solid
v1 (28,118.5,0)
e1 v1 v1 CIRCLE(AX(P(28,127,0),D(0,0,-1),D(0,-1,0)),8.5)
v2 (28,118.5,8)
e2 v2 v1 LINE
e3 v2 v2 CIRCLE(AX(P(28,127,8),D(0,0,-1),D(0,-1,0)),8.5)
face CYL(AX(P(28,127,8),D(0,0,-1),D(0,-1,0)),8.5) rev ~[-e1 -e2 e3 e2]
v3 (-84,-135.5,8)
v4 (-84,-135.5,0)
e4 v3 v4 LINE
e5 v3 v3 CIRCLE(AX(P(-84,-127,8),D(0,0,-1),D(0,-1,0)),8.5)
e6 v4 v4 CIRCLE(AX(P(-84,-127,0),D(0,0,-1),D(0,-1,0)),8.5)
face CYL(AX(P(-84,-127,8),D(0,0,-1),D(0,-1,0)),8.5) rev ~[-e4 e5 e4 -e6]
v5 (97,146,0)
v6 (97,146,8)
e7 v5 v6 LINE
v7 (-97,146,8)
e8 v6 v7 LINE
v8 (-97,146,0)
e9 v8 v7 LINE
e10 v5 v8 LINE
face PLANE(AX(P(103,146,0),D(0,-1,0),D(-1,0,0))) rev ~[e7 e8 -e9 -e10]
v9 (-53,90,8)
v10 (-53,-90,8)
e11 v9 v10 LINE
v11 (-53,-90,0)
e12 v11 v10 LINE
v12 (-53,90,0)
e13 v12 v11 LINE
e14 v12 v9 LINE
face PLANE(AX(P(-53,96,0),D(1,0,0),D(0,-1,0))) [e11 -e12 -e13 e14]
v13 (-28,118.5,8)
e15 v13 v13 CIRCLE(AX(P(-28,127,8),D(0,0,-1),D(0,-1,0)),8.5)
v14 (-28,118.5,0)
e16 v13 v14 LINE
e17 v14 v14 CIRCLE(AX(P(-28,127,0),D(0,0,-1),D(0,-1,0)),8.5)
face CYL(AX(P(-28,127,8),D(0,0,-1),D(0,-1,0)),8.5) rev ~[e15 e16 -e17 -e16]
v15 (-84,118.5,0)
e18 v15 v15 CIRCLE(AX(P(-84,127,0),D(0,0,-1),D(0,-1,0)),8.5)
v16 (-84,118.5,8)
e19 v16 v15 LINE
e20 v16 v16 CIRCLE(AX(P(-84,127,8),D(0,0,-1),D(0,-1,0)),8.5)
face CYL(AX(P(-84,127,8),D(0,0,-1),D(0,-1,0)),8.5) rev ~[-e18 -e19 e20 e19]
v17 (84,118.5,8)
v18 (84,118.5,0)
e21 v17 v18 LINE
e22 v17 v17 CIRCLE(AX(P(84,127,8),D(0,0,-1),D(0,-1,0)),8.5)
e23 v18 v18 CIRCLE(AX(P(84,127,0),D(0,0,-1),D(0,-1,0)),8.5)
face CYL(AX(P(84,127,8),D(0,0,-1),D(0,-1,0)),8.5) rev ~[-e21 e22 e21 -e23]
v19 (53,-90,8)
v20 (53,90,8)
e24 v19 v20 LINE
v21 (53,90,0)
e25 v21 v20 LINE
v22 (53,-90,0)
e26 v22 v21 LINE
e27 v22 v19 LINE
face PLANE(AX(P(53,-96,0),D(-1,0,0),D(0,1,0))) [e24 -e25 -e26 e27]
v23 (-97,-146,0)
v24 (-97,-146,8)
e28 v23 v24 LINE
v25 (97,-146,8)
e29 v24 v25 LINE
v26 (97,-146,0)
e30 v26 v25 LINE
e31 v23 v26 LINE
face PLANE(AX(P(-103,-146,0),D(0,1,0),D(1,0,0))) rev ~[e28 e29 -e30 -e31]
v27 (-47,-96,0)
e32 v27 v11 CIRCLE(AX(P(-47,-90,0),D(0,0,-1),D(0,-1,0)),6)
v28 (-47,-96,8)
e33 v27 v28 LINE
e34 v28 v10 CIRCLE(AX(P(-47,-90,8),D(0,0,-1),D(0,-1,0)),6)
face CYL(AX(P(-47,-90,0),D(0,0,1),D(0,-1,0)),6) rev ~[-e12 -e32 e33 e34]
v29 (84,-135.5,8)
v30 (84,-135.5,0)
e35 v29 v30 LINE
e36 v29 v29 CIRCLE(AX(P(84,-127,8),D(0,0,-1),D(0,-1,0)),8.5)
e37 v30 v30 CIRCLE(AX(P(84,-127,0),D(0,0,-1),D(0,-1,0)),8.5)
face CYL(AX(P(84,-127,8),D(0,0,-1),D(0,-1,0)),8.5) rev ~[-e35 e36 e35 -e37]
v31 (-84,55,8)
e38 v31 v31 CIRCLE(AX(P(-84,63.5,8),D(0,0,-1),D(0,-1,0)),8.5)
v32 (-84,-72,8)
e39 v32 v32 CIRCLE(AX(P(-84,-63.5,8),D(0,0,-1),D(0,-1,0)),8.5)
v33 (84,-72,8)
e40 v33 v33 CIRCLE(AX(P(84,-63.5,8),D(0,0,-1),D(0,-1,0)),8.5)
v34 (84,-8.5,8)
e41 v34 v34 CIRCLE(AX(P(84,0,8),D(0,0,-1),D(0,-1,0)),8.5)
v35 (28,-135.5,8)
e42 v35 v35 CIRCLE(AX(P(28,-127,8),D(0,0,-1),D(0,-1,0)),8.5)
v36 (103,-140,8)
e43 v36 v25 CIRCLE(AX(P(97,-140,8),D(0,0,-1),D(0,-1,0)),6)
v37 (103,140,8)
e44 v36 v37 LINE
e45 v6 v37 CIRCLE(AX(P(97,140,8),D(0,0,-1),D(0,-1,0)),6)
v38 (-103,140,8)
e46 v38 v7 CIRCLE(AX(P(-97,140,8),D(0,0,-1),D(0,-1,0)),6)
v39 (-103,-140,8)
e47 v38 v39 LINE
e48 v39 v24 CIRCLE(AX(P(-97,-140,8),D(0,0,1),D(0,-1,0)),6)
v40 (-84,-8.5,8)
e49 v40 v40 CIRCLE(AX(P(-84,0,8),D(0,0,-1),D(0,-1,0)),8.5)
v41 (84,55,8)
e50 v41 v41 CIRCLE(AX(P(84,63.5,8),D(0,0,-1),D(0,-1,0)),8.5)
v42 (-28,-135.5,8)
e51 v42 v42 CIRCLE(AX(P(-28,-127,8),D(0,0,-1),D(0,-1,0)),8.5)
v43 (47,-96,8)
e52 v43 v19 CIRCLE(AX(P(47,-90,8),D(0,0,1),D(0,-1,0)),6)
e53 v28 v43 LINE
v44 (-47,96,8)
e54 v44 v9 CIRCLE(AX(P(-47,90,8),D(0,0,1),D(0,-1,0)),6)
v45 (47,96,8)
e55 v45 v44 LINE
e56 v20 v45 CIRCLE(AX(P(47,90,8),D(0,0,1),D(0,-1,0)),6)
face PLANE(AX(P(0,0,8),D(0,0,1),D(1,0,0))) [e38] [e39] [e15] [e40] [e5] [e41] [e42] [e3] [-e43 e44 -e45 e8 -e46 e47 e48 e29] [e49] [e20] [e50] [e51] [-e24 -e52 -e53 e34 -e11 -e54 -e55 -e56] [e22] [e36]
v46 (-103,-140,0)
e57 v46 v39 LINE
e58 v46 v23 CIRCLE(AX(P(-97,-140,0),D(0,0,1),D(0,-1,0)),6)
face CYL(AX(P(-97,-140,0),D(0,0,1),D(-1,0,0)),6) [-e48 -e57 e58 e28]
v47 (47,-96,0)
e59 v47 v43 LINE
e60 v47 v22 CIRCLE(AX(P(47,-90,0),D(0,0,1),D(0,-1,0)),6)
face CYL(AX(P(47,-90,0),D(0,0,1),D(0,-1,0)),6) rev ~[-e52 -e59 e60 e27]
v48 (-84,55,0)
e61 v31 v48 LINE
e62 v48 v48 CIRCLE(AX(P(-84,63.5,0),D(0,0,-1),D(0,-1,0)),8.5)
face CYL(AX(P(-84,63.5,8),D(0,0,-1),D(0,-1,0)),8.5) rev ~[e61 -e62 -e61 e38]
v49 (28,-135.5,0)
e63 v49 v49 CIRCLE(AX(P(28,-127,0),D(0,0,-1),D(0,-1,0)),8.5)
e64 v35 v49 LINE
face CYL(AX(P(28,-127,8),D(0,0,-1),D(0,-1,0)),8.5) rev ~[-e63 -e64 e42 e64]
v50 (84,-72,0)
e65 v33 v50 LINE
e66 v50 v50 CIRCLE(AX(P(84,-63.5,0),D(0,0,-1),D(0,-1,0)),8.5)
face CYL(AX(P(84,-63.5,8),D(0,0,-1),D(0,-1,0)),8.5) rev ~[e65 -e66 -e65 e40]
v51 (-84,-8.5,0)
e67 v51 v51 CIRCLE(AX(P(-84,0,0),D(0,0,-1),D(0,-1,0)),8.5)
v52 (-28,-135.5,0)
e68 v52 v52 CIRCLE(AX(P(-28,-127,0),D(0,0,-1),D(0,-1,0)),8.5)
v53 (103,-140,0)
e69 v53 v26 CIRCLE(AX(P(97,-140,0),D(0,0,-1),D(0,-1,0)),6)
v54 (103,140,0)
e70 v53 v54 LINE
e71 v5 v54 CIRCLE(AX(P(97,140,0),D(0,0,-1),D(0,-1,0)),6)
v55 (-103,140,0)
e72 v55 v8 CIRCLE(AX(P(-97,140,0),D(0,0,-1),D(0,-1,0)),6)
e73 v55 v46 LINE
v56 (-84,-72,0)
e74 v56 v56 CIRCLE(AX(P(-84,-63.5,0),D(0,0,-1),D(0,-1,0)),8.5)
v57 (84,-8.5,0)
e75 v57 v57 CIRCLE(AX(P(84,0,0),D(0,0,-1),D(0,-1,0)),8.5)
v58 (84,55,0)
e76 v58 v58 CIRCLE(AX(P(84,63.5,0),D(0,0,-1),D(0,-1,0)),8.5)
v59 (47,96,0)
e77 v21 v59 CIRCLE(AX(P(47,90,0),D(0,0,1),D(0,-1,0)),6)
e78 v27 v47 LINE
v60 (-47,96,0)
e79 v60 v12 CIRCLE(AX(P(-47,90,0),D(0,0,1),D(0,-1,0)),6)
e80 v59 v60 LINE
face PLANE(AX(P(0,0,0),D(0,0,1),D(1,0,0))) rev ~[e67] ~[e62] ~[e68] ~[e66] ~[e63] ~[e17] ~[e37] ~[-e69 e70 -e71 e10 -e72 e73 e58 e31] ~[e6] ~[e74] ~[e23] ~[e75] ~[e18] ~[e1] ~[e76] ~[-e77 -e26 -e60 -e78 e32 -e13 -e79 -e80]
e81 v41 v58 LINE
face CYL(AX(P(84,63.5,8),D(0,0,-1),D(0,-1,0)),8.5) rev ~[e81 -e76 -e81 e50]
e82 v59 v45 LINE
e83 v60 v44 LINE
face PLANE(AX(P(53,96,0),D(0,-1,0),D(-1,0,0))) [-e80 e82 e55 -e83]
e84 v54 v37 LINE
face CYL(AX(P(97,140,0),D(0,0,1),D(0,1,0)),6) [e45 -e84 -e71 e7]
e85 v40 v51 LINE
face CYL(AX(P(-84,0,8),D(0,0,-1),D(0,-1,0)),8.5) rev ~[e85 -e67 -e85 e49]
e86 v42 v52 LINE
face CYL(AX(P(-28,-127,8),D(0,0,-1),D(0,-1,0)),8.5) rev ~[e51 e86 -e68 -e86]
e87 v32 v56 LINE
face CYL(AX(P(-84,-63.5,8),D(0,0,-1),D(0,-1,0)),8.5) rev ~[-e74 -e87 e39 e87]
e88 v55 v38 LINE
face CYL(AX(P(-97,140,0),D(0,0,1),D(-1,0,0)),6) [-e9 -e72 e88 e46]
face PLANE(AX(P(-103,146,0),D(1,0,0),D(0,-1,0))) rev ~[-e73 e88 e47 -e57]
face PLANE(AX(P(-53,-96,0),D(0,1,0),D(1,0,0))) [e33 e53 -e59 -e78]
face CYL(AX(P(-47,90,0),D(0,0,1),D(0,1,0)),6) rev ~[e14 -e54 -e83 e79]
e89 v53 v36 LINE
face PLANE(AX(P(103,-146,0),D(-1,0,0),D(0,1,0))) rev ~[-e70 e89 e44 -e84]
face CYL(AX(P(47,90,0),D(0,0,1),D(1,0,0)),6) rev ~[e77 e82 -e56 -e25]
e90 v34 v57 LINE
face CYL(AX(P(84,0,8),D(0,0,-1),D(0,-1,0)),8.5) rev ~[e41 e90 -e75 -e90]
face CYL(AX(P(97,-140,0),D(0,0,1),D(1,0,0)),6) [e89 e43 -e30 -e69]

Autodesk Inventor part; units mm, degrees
ref_plane "YZ Plane" through (0, 0, 0) normal (1, 0, 0) x (0, 1, 0)
ref_plane "XZ Plane" through (0, 0, 0) normal (0, 1, 0) x (-1, 0, 0)
ref_plane "XY Plane" through (0, 0, 0) normal (0, 0, 1) x (1, 0, 0)
sketch "Sketch2" plane through (0, 0, 0) normal (0, 0, 1) x (1, 0, 0)
  line L0 (-53, -96) -> (53, -96)
  line L1 (53, -96) -> (53, 96)
  line L2 (53, 96) -> (-53, 96)
  line L3 (-53, 96) -> (-53, -96)
  line L4 (-53, -96) -> (53, 96) construction
  line L5 (53, -96) -> (-53, 96) construction
  line L6 (-103, -146) -> (103, -146)
  line L7 (103, -146) -> (103, 146)
  line L8 (103, 146) -> (-103, 146)
  line L9 (-103, 146) -> (-103, -146)
  point P0 (0, 0)
  dimension "d29" = 106
  dimension "d30" = 192
  dimension "d31" = 50
extrude "Plate2" add sketch "Sketch2" along normal blind 8
sketch "Sketch5" plane through (0, 0, 8) normal (0, 0, 1) x (1, 0, 0)
  line L0 (53, 96) -> (53, -96) construction
  line L1 (53, -96) -> (-53, -96) construction
  line L2 (-53, -96) -> (-53, 96) construction
  line L3 (-53, 96) -> (53, 96) construction
  line L4 (103, -146) -> (-103, -146) construction
  line L5 (103, 146) -> (103, -146) construction
  line L6 (-103, 146) -> (103, 146) construction
  line L7 (-103, -146) -> (-103, 146) construction
  line L8 (-84, 127) -> (84, 127) construction
  line L9 (84, 127) -> (84, -127) construction
  line L10 (84, -127) -> (-84, -127) construction
  line L11 (-84, -127) -> (-84, 127) construction
  line L12 (-53, 0) -> (53, 0) construction
  line L13 (0, 96) -> (0, -96)
  point P0 (0, 0)
  point P1 (0, -127)
  point P2 (-84, 63.5)
  point P3 (-84, 0)
  point P4 (-84, -63.5)
  point P5 (-28, -127)
  point P6 (28, -127)
  point P7 (84, -63.5)
  point P8 (84, 0)
  point P9 (84, 63.5)
  point P10 (28, 127)
  point P11 (-28, 127)
  dimension "d34" = 19
  dimension "d49" = 63.5
  dimension "d50" = 63.5
  dimension "d51" = 56
  dimension "d52" = 56
  dimension "d53" = 56
fillet "Corner Round1" radius 6 8 edges at (-103, -146, 4) (-103, 146, 4) (103, 146, 4) (103, -146, 4) (53, -96, 4) (-53, -96, 4) (-53, 96, 4) (53, 96, 4)
hole "Hole1" at (-84, 127, 8) at (-84, 63.5, 8) at (-84, 0, 8) at (-84, -63.5, 8) at (-84, -127, 8) at (-28, -127, 8) at (28, -127, 8) at (84, -127, 8) at (84, -63.5, 8) at (84, 0, 8) at (84, 63.5, 8) at (84, 127, 8) at (28, 127, 8) at (-28, 127, 8) direction (0, 0, -1) diameter 17 end through all
equation "\"d49\" = d50"
equation "\"d51\" = d53"
equation "\"d52\" = d53"
equation "\"d29\" = ChargingHatch_hight - 2 * Thickness"
equation "\"d30\" = ChargingHatch_width - 2 * Thickness"
equation "\"d59\" = Thickness"
equation "\"d14\" = Thickness"
equation "\"BendReliefWidth\" = Thickness"
equation "\"BendReliefDepth\" = 0.5 * Thickness"
equation "\"CornerReliefSize\" = 4 * Thickness"
equation "\"MinimumRemnant\" = 2 * Thickness"
equation "\"TransitionRadius\" = BendRadius"
equation "\"JacobiRadiusSize\" = BendRadius"
equation "\"GapSize\" = Thickness"
equation "\"ChargingHatch_hight\" = 122"
equation "\"Thickness\" = 8"
equation "\"ChargingHatch_width\" = 208"
equation "\"BendRadius\" = 6"
properties part number "PRS 9606 charging flange round_D1200 940" material "Steel"
